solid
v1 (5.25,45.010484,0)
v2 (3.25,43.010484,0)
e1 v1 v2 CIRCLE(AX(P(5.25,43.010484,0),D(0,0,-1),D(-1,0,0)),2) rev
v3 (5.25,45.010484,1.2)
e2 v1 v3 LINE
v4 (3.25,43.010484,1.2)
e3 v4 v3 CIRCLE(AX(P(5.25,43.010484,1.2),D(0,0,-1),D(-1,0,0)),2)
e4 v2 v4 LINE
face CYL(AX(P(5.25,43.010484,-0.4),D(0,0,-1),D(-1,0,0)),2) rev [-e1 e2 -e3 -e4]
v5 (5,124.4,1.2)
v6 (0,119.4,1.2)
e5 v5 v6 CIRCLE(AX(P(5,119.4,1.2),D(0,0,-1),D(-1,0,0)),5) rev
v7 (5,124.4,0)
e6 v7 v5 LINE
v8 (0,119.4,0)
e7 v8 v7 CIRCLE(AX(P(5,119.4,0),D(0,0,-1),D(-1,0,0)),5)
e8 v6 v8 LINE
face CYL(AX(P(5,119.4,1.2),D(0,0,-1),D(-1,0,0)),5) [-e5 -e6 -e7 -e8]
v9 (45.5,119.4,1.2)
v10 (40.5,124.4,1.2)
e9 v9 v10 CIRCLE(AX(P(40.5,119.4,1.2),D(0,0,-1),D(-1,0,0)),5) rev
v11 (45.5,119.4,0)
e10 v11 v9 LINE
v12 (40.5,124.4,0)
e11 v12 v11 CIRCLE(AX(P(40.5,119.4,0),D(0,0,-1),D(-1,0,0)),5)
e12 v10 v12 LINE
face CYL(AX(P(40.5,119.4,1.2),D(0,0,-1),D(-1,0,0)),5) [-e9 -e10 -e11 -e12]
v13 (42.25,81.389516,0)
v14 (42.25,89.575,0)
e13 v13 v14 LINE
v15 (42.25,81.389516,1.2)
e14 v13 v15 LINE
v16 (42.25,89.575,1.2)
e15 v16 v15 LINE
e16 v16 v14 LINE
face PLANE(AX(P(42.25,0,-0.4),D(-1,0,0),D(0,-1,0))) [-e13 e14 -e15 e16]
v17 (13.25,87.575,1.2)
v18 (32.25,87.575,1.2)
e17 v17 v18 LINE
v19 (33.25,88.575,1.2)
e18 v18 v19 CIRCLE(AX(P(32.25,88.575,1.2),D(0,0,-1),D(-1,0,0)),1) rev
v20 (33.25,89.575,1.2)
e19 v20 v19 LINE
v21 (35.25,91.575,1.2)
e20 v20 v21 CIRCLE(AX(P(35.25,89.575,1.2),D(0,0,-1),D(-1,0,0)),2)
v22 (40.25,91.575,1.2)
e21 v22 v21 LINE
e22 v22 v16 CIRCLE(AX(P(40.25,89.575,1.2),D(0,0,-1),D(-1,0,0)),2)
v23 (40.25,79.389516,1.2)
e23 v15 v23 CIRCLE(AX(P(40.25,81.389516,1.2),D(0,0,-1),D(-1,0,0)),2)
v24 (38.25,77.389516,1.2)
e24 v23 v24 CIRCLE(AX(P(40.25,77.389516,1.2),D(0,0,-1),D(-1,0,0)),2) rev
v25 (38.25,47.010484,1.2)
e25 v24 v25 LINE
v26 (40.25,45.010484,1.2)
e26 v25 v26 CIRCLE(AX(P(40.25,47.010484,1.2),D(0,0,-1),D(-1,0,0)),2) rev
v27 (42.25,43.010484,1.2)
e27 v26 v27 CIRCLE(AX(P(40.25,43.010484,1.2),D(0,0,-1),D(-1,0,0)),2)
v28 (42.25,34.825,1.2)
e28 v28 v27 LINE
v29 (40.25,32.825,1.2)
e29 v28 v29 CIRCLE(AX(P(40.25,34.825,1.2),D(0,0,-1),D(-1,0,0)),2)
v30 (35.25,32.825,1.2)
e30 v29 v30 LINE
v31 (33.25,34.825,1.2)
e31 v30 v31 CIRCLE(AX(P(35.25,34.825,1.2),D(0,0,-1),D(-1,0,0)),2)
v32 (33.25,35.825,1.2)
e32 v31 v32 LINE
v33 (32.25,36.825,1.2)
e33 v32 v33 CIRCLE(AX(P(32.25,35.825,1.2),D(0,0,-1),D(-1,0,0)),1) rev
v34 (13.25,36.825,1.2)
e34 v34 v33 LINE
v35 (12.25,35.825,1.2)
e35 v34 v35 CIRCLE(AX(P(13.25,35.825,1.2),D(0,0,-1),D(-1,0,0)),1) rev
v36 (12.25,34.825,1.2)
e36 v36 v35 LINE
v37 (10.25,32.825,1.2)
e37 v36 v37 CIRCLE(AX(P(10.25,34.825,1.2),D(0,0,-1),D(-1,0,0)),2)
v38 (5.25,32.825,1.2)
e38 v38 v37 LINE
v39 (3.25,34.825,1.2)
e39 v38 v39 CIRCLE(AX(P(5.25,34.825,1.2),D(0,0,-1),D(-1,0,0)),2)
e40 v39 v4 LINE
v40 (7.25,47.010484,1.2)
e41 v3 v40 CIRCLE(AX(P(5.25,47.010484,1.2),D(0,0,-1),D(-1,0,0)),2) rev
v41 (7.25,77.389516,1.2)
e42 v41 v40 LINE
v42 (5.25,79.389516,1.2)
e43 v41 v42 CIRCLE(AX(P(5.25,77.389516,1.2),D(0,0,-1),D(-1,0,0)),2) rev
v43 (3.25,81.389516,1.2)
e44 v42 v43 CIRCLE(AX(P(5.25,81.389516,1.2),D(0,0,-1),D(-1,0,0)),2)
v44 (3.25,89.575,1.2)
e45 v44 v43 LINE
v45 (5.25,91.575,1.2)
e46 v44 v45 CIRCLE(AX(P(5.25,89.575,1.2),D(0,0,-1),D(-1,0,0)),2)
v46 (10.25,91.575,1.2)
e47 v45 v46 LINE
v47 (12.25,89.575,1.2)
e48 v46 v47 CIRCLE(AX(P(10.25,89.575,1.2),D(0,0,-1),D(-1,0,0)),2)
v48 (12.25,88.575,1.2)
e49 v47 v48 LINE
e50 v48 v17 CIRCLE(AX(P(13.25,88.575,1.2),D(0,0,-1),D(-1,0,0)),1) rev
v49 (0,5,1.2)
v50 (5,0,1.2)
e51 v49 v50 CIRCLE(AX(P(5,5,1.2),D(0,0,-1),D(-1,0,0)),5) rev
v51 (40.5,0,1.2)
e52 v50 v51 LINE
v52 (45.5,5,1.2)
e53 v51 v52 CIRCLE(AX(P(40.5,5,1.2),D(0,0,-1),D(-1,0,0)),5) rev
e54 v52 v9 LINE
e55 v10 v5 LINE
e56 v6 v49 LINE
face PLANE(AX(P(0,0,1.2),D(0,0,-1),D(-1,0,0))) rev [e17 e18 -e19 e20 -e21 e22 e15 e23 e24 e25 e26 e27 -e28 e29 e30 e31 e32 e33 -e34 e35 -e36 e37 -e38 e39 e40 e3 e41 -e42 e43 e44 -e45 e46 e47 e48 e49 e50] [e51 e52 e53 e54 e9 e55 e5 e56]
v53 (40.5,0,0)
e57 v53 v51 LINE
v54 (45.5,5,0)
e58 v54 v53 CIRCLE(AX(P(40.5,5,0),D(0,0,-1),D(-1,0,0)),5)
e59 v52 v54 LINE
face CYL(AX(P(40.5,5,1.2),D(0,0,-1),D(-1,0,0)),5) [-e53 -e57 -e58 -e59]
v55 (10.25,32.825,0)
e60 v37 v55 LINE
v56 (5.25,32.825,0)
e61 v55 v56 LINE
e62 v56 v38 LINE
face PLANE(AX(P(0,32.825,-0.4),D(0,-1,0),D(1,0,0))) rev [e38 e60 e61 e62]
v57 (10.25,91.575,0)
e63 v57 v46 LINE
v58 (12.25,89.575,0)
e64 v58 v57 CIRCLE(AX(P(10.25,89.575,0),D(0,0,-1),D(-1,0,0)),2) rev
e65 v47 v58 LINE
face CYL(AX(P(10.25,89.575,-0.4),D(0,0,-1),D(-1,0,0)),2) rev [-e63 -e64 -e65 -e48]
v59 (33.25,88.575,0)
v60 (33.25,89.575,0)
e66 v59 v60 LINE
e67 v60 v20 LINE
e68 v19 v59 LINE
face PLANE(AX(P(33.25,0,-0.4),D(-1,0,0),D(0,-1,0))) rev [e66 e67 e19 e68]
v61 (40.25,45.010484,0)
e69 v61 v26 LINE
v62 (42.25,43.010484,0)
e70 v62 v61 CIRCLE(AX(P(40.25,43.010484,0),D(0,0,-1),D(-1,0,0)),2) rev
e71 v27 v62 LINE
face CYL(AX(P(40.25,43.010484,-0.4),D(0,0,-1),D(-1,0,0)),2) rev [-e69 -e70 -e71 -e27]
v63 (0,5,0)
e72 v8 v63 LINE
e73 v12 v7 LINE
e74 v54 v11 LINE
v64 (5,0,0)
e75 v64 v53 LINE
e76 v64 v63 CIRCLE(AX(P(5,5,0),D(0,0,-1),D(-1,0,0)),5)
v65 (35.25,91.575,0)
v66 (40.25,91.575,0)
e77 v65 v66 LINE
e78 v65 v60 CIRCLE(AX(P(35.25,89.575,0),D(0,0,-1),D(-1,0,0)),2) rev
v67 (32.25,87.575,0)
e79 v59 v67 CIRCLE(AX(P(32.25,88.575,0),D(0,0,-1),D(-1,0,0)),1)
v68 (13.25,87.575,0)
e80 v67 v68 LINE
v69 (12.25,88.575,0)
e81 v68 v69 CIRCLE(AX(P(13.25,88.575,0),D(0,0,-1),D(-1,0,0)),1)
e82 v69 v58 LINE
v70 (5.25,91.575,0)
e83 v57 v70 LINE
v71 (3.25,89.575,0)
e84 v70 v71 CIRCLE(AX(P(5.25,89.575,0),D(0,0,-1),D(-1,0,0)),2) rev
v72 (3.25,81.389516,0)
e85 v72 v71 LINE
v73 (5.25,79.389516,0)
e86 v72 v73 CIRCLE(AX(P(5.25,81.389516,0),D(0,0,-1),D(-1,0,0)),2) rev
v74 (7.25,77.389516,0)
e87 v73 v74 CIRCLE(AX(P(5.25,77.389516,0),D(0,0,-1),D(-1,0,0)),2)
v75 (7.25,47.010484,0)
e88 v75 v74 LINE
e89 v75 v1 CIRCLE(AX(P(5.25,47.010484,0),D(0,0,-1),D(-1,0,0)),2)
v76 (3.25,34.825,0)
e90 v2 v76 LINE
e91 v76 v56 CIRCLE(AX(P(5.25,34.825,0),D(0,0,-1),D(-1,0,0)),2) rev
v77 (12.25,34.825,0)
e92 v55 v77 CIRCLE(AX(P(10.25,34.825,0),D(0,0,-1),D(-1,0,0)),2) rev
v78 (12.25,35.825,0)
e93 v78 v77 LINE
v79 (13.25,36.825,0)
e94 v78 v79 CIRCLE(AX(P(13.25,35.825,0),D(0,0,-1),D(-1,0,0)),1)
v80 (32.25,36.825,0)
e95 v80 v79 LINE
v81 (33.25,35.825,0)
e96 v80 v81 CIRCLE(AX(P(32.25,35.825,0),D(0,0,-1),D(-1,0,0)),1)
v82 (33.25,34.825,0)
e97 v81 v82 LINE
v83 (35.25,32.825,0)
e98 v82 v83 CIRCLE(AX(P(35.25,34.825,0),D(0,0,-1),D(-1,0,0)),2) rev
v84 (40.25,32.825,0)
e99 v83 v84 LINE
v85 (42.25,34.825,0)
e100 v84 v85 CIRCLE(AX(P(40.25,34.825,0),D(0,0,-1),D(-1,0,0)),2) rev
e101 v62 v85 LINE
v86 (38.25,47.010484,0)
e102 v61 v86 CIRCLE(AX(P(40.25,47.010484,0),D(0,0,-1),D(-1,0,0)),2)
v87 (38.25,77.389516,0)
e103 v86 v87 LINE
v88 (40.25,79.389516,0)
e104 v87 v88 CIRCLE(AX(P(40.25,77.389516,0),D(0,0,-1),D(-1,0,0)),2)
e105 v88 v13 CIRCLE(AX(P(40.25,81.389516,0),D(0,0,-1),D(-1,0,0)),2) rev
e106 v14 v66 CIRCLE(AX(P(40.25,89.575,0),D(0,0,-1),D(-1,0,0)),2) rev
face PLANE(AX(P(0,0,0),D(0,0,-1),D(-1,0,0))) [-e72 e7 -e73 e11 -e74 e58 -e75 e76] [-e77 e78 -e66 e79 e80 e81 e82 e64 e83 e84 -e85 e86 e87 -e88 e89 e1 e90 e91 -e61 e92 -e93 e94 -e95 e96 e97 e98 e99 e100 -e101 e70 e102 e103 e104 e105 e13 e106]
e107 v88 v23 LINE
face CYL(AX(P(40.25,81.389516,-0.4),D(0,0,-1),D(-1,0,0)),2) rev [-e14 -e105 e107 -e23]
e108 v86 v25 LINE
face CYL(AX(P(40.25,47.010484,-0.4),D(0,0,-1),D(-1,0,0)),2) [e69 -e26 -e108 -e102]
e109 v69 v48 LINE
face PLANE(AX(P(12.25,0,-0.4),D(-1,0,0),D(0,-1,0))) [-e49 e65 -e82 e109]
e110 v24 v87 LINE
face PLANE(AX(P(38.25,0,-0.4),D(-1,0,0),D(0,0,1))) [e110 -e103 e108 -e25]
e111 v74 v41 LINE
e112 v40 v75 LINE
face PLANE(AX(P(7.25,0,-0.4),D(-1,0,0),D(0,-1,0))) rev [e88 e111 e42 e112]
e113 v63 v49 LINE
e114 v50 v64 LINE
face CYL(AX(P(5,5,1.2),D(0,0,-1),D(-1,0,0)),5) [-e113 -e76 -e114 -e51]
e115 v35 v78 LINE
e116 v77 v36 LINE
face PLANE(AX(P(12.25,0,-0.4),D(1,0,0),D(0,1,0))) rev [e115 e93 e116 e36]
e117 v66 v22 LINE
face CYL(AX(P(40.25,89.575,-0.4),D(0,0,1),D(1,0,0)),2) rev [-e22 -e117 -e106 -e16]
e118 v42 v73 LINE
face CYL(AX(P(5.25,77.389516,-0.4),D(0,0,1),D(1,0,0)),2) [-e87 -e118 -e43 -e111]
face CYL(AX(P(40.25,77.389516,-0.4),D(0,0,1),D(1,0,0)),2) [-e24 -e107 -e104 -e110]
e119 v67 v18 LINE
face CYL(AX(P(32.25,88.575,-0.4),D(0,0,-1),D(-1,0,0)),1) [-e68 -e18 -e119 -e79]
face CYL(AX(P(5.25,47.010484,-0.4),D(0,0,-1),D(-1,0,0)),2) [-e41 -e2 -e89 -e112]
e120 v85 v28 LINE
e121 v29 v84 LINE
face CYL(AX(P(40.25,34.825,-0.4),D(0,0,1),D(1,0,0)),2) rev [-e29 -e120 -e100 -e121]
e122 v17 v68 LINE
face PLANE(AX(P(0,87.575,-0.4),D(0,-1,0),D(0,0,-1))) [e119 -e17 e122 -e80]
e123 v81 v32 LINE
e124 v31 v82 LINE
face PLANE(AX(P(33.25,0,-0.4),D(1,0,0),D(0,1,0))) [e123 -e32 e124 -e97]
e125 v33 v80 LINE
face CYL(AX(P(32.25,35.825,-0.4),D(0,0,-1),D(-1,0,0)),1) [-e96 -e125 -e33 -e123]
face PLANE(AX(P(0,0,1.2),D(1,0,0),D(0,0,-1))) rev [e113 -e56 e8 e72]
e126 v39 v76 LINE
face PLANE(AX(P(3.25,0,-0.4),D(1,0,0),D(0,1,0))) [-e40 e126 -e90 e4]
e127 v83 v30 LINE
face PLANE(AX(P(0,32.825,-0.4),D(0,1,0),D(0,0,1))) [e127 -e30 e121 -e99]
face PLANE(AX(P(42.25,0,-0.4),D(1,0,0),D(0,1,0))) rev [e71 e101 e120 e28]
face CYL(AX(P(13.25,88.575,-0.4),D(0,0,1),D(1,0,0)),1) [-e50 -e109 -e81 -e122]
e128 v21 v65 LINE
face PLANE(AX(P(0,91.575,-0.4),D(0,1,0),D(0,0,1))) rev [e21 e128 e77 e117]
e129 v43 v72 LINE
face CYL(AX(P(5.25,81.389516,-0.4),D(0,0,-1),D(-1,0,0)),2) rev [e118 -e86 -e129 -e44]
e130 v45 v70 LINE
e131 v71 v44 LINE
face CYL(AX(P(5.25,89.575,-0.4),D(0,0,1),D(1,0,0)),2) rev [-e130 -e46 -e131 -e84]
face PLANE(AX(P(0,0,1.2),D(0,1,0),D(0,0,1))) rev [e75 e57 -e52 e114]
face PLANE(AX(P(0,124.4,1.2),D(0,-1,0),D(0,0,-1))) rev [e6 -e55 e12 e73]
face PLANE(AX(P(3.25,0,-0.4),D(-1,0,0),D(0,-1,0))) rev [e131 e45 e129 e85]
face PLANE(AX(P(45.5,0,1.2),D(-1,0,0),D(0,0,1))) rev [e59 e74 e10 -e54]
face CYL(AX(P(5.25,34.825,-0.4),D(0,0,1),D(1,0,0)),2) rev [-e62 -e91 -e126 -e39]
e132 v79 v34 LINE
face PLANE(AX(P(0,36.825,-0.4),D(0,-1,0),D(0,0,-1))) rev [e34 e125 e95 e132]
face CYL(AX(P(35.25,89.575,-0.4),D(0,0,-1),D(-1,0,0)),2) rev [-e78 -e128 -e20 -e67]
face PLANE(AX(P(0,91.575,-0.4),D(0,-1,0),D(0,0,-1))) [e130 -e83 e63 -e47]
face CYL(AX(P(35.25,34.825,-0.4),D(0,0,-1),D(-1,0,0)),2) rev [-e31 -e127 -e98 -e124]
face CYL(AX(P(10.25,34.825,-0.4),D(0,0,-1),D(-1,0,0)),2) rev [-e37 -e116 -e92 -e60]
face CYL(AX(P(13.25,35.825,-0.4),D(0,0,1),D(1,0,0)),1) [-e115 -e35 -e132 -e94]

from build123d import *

# Parameters (mm, degrees)
SKETCH1_W           = 45.5
SKETCH1_H           = 124.4
BOSS_EXTRUDE1_DEPTH = 1.2
SKETCH2_W           = 5
SKETCH2_H           = 8.185483871
CUT_EXTRUDE1_DEPTH  = 1.6
FILLET1_R           = 2
FILLET2_R           = 1
FILLET3_R           = 5


with BuildPart() as part:
    # Sketch1 → Boss-Extrude1 (new body)
    with BuildSketch(Plane.XY):
        with Locations((22.75, 62.2)):
            Rectangle(SKETCH1_W, SKETCH1_H)
    extrude(amount=BOSS_EXTRUDE1_DEPTH)

    # Sketch2 → Cut-Extrude1 (cut)
    with BuildSketch(Plane.XY.offset(1.2)):
        Polygon((7.25, 87.575), (12.25, 87.575), (12.25, 91.575), (3.25, 91.575), (3.25, 79.389516129), (7.25, 79.389516129), align=None)
        with Locations((9.75, 83.482258065)):
            Rectangle(SKETCH2_W, SKETCH2_H)
        Polygon((33.25, 79.389516129), (33.25, 87.575), (12.25, 87.575), (12.25, 79.389516129), (7.25, 79.389516129), (7.25, 45.010483871), (12.25, 45.010483871), (12.25, 36.825), (33.25, 36.825), (33.25, 45.010483871), (38.25, 45.010483871), (38.25, 79.389516129), align=None)
        with Locations((35.75, 83.482258065)):
            Rectangle(SKETCH2_W, SKETCH2_H)
        Polygon((42.25, 79.389516129), (42.25, 91.575), (33.25, 91.575), (33.25, 87.575), (38.25, 87.575), (38.25, 79.389516129), align=None)
        Polygon((42.25, 45.010483871), (38.25, 45.010483871), (38.25, 36.825), (33.25, 36.825), (33.25, 32.825), (42.25, 32.825), align=None)
        with Locations((35.75, 40.917741936)):
            Rectangle(SKETCH2_W, SKETCH2_H)
        Polygon((7.25, 36.825), (7.25, 45.010483871), (3.25, 45.010483871), (3.25, 32.825), (12.25, 32.825), (12.25, 36.825), align=None)
        with Locations((9.75, 40.917741936)):
            Rectangle(SKETCH2_W, SKETCH2_H)
    extrude(amount=-CUT_EXTRUDE1_DEPTH, mode=Mode.SUBTRACT)

    # Fillet1
    fillet1_edges = [part.edges().sort_by_distance(p)[0] for p in [
        (3.25, 79.389516129, 0.6),
        (12.25, 91.575, 0.6),
        (33.25, 91.575, 0.6),
        (42.25, 91.575, 0.6),
        (42.25, 79.389516129, 0.6),
        (38.25, 79.389516129, 0.6),
        (38.25, 45.010483871, 0.6),
        (42.25, 45.010483871, 0.6),
        (42.25, 32.825, 0.6),
        (33.25, 32.825, 0.6),
        (12.25, 32.825, 0.6),
        (3.25, 32.825, 0.6),
        (3.25, 45.010483871, 0.6),
        (7.25, 45.010483871, 0.6),
        (7.25, 79.389516129, 0.6),
        (3.25, 91.575, 0.6),
    ]]
    fillet(fillet1_edges, radius=FILLET1_R - 0.0001)  # a hair under: the kernel refuses the full size

    # Fillet2
    fillet2_edges = [part.edges().sort_by_distance(p)[0] for p in [
        (12.25, 36.825, 0.6),
        (12.25, 87.575, 0.6),
        (33.25, 87.575, 0.6),
        (33.25, 36.825, 0.6),
    ]]
    fillet(fillet2_edges, radius=FILLET2_R)

    # Fillet3
    fillet3_edges = [part.edges().sort_by_distance(p)[0] for p in [
        (0, 124.4, 0.6),
        (45.5, 124.4, 0.6),
        (45.5, 0, 0.6),
        (0, 0, 0.6),
    ]]
    fillet(fillet3_edges, radius=FILLET3_R)


solid = part.part
